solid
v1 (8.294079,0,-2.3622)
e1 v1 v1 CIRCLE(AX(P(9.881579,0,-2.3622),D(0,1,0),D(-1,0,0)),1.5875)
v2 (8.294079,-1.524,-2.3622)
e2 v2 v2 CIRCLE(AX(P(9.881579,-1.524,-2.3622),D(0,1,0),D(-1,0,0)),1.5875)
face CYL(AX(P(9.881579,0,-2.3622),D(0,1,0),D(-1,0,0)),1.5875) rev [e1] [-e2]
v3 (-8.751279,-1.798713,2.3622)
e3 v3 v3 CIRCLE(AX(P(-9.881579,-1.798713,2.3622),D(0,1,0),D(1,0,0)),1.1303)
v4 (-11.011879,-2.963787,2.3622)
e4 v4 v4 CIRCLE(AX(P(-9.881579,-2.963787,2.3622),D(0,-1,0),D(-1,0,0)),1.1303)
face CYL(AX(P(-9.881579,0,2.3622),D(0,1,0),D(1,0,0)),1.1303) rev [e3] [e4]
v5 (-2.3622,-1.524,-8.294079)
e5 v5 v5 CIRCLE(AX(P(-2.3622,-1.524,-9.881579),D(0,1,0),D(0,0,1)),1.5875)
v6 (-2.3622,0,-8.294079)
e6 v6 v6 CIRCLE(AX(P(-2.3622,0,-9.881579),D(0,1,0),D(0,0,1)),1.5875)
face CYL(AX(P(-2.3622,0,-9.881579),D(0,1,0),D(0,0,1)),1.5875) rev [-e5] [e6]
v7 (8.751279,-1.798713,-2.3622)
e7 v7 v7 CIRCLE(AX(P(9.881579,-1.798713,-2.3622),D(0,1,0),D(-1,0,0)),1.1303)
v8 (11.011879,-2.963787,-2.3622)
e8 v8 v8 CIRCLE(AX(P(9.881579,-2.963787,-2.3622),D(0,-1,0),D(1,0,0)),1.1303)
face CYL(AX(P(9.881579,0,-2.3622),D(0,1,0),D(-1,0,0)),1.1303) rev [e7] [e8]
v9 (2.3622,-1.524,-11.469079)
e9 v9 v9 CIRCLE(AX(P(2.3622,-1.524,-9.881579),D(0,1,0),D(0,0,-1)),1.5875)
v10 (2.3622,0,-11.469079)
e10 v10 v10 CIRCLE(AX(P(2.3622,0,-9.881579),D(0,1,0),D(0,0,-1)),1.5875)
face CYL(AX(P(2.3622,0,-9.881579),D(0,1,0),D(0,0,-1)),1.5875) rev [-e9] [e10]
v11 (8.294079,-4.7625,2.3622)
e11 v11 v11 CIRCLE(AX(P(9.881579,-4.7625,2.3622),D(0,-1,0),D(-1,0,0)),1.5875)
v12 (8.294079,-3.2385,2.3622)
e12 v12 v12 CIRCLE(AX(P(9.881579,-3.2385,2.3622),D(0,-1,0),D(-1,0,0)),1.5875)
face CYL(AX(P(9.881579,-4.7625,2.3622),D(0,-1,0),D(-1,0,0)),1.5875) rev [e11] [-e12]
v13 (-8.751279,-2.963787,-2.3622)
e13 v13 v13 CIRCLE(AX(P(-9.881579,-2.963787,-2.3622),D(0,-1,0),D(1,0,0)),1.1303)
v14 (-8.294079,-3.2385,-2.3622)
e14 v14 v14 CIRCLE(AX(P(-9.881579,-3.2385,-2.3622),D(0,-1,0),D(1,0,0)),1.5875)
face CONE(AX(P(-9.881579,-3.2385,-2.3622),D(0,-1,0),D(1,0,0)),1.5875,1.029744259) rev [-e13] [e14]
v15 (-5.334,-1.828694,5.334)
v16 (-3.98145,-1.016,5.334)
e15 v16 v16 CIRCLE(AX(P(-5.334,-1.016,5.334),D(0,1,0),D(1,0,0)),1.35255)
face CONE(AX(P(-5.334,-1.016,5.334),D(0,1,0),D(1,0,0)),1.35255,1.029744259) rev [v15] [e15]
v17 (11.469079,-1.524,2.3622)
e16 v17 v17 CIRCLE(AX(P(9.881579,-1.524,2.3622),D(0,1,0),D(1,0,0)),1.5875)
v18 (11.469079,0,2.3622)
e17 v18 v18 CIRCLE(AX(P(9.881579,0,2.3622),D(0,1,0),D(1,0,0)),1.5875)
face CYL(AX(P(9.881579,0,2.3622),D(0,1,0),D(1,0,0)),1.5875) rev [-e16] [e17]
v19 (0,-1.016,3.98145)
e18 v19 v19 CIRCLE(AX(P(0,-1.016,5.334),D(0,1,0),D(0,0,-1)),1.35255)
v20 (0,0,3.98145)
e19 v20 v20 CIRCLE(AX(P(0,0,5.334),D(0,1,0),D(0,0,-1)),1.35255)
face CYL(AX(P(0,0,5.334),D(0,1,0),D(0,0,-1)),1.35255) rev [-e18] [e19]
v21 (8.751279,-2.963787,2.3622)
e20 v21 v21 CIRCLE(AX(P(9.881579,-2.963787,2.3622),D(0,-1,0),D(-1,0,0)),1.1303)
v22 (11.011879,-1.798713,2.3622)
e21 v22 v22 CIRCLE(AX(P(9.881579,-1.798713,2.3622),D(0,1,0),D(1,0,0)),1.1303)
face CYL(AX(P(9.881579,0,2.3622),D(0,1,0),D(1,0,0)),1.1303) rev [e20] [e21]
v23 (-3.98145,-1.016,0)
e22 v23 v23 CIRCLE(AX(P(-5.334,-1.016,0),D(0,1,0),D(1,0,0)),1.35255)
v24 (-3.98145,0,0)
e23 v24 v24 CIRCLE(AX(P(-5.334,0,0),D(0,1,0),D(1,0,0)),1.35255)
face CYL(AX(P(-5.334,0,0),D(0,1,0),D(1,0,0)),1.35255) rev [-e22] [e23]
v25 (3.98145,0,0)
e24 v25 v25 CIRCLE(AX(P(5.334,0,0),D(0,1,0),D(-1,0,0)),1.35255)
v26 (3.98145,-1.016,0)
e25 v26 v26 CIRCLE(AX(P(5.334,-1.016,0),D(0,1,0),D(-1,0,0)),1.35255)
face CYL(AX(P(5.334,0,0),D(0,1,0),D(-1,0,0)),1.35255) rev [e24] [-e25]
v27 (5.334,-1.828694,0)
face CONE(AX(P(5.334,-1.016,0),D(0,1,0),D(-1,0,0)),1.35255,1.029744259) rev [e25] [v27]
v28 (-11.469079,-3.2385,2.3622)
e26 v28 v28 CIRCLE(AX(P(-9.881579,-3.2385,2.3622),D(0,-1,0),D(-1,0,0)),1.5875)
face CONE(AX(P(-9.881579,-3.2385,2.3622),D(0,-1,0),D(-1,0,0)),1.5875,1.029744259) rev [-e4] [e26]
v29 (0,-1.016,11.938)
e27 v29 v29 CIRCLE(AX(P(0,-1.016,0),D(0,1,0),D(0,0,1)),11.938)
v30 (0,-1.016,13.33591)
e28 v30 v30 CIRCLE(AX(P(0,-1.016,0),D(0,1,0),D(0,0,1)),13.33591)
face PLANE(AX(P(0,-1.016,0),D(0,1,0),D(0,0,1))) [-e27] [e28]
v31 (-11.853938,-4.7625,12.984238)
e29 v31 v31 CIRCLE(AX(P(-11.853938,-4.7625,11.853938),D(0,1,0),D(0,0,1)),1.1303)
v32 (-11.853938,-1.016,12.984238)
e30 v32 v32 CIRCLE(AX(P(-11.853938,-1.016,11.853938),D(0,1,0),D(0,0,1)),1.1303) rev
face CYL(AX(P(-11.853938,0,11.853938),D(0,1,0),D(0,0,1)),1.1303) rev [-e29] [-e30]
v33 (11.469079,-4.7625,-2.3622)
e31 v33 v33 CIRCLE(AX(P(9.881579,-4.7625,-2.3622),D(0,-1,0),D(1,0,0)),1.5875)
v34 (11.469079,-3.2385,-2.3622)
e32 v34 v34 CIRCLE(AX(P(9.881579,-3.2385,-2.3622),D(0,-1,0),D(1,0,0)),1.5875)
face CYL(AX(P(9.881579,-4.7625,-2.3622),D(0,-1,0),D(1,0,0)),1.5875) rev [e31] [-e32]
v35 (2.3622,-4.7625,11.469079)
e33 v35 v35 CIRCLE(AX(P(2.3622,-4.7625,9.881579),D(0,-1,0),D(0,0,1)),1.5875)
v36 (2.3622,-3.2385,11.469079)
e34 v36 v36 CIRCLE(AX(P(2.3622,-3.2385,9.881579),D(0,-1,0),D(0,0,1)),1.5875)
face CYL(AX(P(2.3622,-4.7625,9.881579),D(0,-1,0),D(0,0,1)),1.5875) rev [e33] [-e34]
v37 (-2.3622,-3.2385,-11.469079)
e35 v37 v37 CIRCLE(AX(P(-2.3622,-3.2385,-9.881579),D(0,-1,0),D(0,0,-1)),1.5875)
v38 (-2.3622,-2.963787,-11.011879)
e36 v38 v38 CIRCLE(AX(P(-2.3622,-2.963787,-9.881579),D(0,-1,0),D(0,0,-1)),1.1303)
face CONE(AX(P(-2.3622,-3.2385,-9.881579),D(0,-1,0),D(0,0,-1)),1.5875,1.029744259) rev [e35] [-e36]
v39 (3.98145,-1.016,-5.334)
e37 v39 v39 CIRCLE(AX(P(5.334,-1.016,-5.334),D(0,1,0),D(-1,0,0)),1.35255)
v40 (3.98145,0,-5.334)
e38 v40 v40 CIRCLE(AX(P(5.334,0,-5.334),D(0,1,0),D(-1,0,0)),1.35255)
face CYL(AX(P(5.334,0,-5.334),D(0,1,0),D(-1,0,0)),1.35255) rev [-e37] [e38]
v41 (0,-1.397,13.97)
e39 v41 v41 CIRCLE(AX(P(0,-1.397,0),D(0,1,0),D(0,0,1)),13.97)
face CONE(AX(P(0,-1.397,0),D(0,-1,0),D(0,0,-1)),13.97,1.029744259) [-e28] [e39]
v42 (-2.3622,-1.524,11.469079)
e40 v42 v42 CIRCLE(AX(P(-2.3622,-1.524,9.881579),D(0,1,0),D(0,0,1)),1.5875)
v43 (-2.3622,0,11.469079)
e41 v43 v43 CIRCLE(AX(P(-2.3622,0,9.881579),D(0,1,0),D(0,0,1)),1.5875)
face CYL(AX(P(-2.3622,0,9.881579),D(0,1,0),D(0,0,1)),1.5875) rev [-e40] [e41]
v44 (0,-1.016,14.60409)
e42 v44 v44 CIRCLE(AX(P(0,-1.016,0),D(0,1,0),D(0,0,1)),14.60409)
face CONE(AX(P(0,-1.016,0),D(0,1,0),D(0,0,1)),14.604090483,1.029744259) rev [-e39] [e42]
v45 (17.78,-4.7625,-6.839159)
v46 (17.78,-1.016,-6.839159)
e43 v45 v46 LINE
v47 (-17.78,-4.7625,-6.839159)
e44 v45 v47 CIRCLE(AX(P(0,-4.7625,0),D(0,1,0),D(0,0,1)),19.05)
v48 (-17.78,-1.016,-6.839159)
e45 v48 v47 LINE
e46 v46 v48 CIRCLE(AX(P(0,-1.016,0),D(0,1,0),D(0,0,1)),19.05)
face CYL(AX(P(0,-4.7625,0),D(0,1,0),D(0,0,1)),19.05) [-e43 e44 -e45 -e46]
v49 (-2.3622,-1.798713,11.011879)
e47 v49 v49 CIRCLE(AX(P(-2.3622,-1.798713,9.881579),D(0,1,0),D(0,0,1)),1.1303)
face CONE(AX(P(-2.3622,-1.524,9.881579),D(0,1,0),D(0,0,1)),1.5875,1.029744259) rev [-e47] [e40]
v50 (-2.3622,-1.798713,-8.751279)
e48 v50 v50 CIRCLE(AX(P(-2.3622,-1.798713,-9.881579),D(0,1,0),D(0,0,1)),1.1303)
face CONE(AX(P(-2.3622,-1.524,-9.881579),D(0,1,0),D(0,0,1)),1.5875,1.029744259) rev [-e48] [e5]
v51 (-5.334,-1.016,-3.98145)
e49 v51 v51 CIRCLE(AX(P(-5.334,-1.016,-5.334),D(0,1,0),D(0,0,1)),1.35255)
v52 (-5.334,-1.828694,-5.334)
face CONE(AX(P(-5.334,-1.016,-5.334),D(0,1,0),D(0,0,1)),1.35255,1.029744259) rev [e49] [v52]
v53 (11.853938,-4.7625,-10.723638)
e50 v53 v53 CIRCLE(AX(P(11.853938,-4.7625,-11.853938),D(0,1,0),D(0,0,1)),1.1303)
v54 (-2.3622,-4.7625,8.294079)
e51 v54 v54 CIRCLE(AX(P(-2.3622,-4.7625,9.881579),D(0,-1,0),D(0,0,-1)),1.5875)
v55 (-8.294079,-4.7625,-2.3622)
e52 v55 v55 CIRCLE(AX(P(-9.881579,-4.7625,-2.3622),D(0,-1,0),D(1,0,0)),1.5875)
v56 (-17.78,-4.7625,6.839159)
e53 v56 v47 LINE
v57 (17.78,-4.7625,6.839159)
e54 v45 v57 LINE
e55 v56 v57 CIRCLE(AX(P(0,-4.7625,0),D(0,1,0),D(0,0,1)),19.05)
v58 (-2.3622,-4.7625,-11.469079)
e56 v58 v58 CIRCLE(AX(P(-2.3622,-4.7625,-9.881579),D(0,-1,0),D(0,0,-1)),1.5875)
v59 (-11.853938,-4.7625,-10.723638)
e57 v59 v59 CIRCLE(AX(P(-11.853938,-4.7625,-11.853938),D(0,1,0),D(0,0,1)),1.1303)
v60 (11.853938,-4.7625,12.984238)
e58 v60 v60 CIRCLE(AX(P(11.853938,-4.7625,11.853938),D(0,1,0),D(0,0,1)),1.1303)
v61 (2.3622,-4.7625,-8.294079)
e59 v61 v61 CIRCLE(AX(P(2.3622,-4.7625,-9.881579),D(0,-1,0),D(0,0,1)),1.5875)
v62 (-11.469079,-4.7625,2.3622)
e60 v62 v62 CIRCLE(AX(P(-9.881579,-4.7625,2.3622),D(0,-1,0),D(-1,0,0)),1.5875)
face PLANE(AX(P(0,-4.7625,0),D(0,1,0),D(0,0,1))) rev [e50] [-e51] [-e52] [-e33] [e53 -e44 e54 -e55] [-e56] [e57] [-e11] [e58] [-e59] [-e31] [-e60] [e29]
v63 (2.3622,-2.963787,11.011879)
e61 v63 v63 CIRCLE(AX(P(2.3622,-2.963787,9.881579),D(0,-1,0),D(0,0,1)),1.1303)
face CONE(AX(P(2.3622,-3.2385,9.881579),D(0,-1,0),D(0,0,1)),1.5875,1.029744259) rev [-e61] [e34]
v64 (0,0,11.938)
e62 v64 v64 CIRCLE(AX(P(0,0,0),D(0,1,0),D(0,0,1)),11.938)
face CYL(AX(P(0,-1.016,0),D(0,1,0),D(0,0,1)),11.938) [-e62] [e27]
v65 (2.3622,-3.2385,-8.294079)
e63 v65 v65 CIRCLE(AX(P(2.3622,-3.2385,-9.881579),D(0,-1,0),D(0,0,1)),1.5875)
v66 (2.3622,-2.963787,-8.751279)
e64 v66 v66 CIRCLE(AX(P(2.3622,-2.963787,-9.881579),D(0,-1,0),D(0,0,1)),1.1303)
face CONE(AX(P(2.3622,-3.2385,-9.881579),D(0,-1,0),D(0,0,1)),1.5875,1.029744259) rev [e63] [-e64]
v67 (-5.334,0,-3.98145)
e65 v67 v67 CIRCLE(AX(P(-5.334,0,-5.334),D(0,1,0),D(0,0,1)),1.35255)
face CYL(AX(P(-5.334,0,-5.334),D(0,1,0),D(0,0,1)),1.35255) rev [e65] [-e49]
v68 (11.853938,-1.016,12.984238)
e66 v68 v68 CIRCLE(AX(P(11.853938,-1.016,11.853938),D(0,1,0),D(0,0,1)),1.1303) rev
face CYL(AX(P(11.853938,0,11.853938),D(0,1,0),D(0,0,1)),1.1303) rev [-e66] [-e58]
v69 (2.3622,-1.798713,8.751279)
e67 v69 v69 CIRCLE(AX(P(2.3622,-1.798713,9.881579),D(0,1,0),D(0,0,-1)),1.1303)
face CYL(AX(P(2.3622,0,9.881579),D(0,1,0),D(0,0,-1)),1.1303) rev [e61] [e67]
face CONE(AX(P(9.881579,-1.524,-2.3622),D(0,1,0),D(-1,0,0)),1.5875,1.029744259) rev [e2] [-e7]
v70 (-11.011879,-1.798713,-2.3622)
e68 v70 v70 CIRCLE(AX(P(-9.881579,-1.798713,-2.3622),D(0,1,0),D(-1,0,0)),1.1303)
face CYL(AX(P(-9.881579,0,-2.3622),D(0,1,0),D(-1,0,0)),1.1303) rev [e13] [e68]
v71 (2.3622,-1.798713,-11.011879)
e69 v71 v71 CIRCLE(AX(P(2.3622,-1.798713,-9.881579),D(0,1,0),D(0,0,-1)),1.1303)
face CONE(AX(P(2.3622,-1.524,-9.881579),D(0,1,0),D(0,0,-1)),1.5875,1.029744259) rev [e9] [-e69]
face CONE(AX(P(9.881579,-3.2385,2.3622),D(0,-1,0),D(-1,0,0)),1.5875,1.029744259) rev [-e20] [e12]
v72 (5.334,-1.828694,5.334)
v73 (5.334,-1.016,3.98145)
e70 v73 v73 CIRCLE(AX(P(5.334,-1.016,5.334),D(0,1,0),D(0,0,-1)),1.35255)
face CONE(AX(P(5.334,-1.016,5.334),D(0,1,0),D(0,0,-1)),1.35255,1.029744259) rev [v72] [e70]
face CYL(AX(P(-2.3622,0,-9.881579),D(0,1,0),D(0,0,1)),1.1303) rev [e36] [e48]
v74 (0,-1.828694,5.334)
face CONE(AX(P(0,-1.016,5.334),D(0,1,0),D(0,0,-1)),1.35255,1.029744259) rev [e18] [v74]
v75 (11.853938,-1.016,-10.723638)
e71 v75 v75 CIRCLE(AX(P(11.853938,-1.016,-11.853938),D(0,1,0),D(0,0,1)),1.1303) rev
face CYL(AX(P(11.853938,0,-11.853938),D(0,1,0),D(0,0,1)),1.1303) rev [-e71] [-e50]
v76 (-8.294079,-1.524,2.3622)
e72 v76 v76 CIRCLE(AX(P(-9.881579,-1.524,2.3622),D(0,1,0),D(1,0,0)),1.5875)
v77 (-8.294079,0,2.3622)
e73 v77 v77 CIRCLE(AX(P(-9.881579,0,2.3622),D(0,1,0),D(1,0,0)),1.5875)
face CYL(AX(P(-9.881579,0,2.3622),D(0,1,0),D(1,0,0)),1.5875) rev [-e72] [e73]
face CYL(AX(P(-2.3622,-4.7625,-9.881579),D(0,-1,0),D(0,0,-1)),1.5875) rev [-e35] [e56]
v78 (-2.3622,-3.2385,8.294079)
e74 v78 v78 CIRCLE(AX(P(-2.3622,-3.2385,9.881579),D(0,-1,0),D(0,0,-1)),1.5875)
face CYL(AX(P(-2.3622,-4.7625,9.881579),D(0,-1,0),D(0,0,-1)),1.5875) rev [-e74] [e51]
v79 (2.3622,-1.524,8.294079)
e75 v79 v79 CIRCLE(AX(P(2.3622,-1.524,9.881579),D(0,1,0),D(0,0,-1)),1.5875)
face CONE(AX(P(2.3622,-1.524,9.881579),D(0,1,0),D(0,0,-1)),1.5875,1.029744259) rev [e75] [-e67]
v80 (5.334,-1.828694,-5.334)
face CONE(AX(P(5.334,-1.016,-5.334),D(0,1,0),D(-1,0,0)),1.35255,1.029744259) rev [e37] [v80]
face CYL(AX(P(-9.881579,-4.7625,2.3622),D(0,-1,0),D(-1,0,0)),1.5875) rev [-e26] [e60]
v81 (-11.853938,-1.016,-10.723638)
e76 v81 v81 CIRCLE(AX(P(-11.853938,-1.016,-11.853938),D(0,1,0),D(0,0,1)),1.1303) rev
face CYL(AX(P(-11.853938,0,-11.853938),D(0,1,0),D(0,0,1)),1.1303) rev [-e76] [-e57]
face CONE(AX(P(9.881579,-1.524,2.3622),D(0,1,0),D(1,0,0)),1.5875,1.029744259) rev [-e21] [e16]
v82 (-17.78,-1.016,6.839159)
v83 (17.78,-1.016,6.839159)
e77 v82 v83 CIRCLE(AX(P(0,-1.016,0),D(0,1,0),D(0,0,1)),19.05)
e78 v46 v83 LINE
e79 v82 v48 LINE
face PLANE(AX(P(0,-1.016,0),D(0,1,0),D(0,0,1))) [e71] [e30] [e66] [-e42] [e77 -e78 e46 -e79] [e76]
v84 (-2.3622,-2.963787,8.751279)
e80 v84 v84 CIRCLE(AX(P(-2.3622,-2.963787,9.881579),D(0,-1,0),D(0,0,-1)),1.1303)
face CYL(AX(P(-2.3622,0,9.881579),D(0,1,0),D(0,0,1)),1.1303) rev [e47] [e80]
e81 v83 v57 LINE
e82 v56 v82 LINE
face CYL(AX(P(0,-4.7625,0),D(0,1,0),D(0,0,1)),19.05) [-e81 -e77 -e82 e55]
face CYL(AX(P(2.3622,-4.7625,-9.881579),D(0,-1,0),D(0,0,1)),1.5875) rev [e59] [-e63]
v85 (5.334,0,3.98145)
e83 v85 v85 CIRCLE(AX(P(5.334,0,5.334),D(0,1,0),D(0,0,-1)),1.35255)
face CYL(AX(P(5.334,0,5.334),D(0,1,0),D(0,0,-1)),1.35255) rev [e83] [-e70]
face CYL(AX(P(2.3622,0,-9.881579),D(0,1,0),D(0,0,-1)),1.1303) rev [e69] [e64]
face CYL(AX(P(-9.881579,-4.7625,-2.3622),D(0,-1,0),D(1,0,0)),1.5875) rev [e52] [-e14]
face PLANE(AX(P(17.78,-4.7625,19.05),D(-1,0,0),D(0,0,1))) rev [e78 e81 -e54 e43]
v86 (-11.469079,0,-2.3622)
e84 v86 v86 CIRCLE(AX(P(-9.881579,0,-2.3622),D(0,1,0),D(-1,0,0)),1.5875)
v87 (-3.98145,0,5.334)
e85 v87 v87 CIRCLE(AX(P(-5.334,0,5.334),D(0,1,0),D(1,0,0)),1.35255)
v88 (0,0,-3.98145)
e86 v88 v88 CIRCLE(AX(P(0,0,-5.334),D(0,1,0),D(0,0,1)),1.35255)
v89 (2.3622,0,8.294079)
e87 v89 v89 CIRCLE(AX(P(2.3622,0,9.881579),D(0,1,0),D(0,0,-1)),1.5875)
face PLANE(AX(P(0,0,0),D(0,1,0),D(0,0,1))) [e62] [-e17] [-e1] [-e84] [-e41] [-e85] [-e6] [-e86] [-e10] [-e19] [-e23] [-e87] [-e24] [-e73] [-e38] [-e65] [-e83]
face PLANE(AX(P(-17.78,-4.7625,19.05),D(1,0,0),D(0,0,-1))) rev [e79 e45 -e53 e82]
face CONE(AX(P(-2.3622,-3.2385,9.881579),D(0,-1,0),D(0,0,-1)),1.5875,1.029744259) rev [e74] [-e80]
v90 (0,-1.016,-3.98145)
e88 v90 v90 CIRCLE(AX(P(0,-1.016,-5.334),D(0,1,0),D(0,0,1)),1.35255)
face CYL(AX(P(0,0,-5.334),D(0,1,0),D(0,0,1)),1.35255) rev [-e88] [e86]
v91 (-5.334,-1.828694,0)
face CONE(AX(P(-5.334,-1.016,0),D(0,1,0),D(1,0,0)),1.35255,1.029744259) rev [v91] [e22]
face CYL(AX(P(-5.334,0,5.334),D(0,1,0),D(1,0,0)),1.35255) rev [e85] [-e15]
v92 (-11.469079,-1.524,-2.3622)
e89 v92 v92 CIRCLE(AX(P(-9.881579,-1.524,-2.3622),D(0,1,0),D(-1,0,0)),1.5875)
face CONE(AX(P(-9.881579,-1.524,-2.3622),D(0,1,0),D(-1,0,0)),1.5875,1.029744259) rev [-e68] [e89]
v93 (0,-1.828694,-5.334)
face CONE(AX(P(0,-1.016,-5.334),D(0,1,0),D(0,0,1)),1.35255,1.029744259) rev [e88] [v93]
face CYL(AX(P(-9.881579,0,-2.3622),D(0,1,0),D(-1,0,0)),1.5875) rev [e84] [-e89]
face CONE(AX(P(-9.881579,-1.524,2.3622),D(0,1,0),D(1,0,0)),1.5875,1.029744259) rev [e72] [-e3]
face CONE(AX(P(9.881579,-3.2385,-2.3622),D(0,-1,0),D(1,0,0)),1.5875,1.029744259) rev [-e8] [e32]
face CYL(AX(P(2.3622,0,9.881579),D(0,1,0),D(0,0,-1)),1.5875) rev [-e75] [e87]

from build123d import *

# Parameters (mm, degrees)
OUTER_R                               = 19.05
BODY_DEPTH                            = 4.7625
F_4_40_TAPPED_HOLE_D                  = 2.2606
SCREW_HOLES_COUNT                     = 4
F_43_0_089_DIAMETER_HOLE1_D           = 2.2606
F_1_8_0_125_DIAMETER_HOLE1_AT_2_COUNT = 2
F_1_8_0_125_DIAMETER_HOLE1_AT_2_PITCH = 19.763158772
F_1_8_0_125_DIAMETER_HOLE2_AT_2_COUNT = 2
F_1_8_0_125_DIAMETER_HOLE2_AT_2_PITCH = 19.763158772
IO_HOLES_PATTERN_COUNT                = 4
INSET_R                               = 19.05
INSET_R_2                             = 11.938
INSET_CUT_DEPTH                       = 1.016
POST_BOTTOMS_COUNT                    = 4
FLAT_CUT_SKETCH_W                     = 2.54
FLAT_CUT_SKETCH_H                     = 38.1
FLAT_CUT_DEPTH                        = 28.358479604


# Read off the part's stored shape, not the designer's step: #36 (0.1065) Diameter Hole1
with BuildPart() as part:
    # outer → Body (new body)
    with BuildSketch(Plane(origin=(0, 0, 0), x_dir=(1, 0, 0), z_dir=(0, 1, 0))):
        with Locations(Location((0, 0, 0), (0, 0, 270))):
            Circle(OUTER_R)
    extrude(amount=-BODY_DEPTH)

    # #4-40 Tapped Hole (through all)
    with Locations(Plane(origin=(0, 0, 0), x_dir=(1, 0, 0), z_dir=(0, 1, 0))):
        with Locations((-11.85393808, 11.85393808)):
            f_4_40_tapped_hole = Hole(F_4_40_TAPPED_HOLE_D / 2)

    # Screw Holes: #4-40 Tapped Hole ×4 about axis
    screw_holes_axis = Axis((0, 0, 0), (0, 1, 0))
    for i in range(1, SCREW_HOLES_COUNT):
        add(f_4_40_tapped_hole.rotate(screw_holes_axis, i * 360 / SCREW_HOLES_COUNT), mode=Mode.SUBTRACT)

    # #43 (0.089) Diameter Hole1 (through all)
    with Locations(Plane(origin=(0, 0, 0), x_dir=(1, 0, 0), z_dir=(0, 1, 0))):
        with Locations((-2.3622, 9.881579386), (-2.3622, -9.881579386)):
            f_43_0_089_diameter_hole1 = Hole(F_43_0_089_DIAMETER_HOLE1_D / 2)

    # Sketch40 → 1/8 (0.125) Diameter Hole1 (revolve, cut)
    with BuildSketch(Plane(origin=(-2.3622, 0, -9.881579386), x_dir=(0, 0, 1), z_dir=(1, 0, 0))):
        Polygon((0, 0), (0, 2.477866233), (1.5875, 1.524), (1.5875, 0), align=None)
    f_1_8_0_125_diameter_hole1 = revolve(axis=Axis((-2.3622, 6.35, -9.881579386), (0, -1, 0)), mode=Mode.SUBTRACT)

    # 1/8 (0.125) Diameter Hole1 at 2: 1/8 (0.125) Diameter Hole1 ×2
    with Locations(*[(0, 0, i * F_1_8_0_125_DIAMETER_HOLE1_AT_2_PITCH) for i in range(1, F_1_8_0_125_DIAMETER_HOLE1_AT_2_COUNT)]):
        add(f_1_8_0_125_diameter_hole1, mode=Mode.SUBTRACT)

    # Sketch42 → 1/8 (0.125) Diameter Hole2 (revolve, cut)
    with BuildSketch(Plane(origin=(-2.3622, -4.7625, -9.881579386), x_dir=(0, 0, -1), z_dir=(1, 0, 0))):
        Polygon((0, 0), (0, 2.477866233), (1.5875, 1.524), (1.5875, 0), align=None)
    f_1_8_0_125_diameter_hole2 = revolve(axis=Axis((-2.3622, -11.1125, -9.881579386), (0, 1, 0)), mode=Mode.SUBTRACT)

    # 1/8 (0.125) Diameter Hole2 at 2: 1/8 (0.125) Diameter Hole2 ×2
    with Locations(*[(0, 0, i * F_1_8_0_125_DIAMETER_HOLE2_AT_2_PITCH) for i in range(1, F_1_8_0_125_DIAMETER_HOLE2_AT_2_COUNT)]):
        add(f_1_8_0_125_diameter_hole2, mode=Mode.SUBTRACT)

    # IO Holes Pattern: #43 (0.089) Diameter Hole1, 1/8 (0.125) Diameter Hole1, 1/8 (0.125) Diameter Hole2 ×4 about axis
    io_holes_pattern_axis = Axis((0, 0, 0), (0, 1, 0))
    add([f_43_0_089_diameter_hole1.rotate(io_holes_pattern_axis, i * 360 / IO_HOLES_PATTERN_COUNT) for i in range(1, IO_HOLES_PATTERN_COUNT)], mode=Mode.SUBTRACT)
    add([f_1_8_0_125_diameter_hole1.rotate(io_holes_pattern_axis, i * 360 / IO_HOLES_PATTERN_COUNT) for i in range(1, IO_HOLES_PATTERN_COUNT)], mode=Mode.SUBTRACT)
    add([f_1_8_0_125_diameter_hole2.rotate(io_holes_pattern_axis, i * 360 / IO_HOLES_PATTERN_COUNT) for i in range(1, IO_HOLES_PATTERN_COUNT)], mode=Mode.SUBTRACT)

    # IO Holes Pattern copy 1 sketch → IO Holes Pattern copy 1 (revolve, cut)
    with BuildSketch(Plane(origin=(9.881579386, 0, 2.3622), x_dir=(1, 0, 0), z_dir=(0, 0, -1))):
        Polygon((0, 0), (0, 2.477866233), (1.5875, 1.524), (1.5875, 0), align=None)
    revolve(axis=Axis((9.881579386, 6.35, 2.3622), (0, -1, 0)), mode=Mode.SUBTRACT)

    # IO Holes Pattern copy 2 sketch → IO Holes Pattern copy 2 (revolve, cut)
    with BuildSketch(Plane(origin=(2.3622, 0, -9.881579386), x_dir=(0, 0, -1), z_dir=(-1, 0, 0))):
        Polygon((0, 0), (0, 2.477866233), (1.5875, 1.524), (1.5875, 0), align=None)
    revolve(axis=Axis((2.3622, 6.35, -9.881579386), (0, -1, 0)), mode=Mode.SUBTRACT)

    # IO Holes Pattern copy 3 sketch → IO Holes Pattern copy 3 (revolve, cut)
    with BuildSketch(Plane(origin=(-9.881579386, 0, -2.3622), x_dir=(-1, 0, 0), z_dir=(0, 0, 1))):
        Polygon((0, 0), (0, 2.477866233), (1.5875, 1.524), (1.5875, 0), align=None)
    revolve(axis=Axis((-9.881579386, 6.35, -2.3622), (0, -1, 0)), mode=Mode.SUBTRACT)

    # IO Holes Pattern copy 4 sketch → IO Holes Pattern copy 4 (revolve, cut)
    with BuildSketch(Plane(origin=(9.881579386, -4.7625, 2.3622), x_dir=(-1, 0, 0), z_dir=(0, 0, -1))):
        Polygon((0, 0), (0, 2.477866233), (1.5875, 1.524), (1.5875, 0), align=None)
    revolve(axis=Axis((9.881579386, -11.1125, 2.3622), (0, 1, 0)), mode=Mode.SUBTRACT)

    # IO Holes Pattern copy 5 sketch → IO Holes Pattern copy 5 (revolve, cut)
    with BuildSketch(Plane(origin=(2.3622, -4.7625, -9.881579386), x_dir=(0, 0, 1), z_dir=(-1, 0, 0))):
        Polygon((0, 0), (0, 2.477866233), (1.5875, 1.524), (1.5875, 0), align=None)
    revolve(axis=Axis((2.3622, -11.1125, -9.881579386), (0, 1, 0)), mode=Mode.SUBTRACT)

    # IO Holes Pattern copy 6 sketch → IO Holes Pattern copy 6 (revolve, cut)
    with BuildSketch(Plane(origin=(-9.881579386, -4.7625, -2.3622), x_dir=(1, 0, 0), z_dir=(0, 0, 1))):
        Polygon((0, 0), (0, 2.477866233), (1.5875, 1.524), (1.5875, 0), align=None)
    revolve(axis=Axis((-9.881579386, -11.1125, -2.3622), (0, 1, 0)), mode=Mode.SUBTRACT)

    # Inset → Inset Cut (cut)
    with BuildSketch(Plane(origin=(0, 0, 0), x_dir=(1, 0, 0), z_dir=(0, 1, 0))):
        with Locations(Location((0, 0, 0), (0, 0, 270))):
            Circle(INSET_R)
        with Locations(Location((0, 0, 0), (0, 0, 270))):
            Circle(INSET_R_2, mode=Mode.SUBTRACT)
    extrude(amount=-INSET_CUT_DEPTH, mode=Mode.SUBTRACT)

    # #36 (0.1065) Diameter Hole1 outline → #36 (0.1065) Diameter Hole1 (revolve, cut)
    with BuildSketch(Plane(origin=(-5.334, 0, -5.334), x_dir=(1, 0, 0), z_dir=(0, 0, 1))):
        Polygon((0, 0), (0, -1.82869403), (1.35255, -1.016), (1.35255, 0), align=None)
    f_36_0_1065_diameter_hole1 = revolve(axis=Axis((-5.334, 0, -5.334), (0, 1, 0)), mode=Mode.SUBTRACT)

    # 36 _0.1065_ Diameter Hole1 2 outline → 36 _0.1065_ Diameter Hole1 2 (revolve, cut)
    with BuildSketch(Plane.XY.offset(-5.334)):
        Polygon((0, 0), (0, -1.82869403), (1.35255, -1.016), (1.35255, 0), align=None)
    f_36_0_1065_diameter_hole1_2 = revolve(axis=Axis((0, 0, -5.334), (0, 1, 0)), mode=Mode.SUBTRACT)

    # Post Bottoms: #36 (0.1065) Diameter Hole1, 36 _0.1065_ Diameter Hole1 2 ×4 about axis
    post_bottoms_axis = Axis((0, 0, 0), (0, 1, 0))
    add([f_36_0_1065_diameter_hole1.rotate(post_bottoms_axis, i * 360 / POST_BOTTOMS_COUNT) for i in range(1, POST_BOTTOMS_COUNT)], mode=Mode.SUBTRACT)
    add([f_36_0_1065_diameter_hole1_2.rotate(post_bottoms_axis, i * 360 / POST_BOTTOMS_COUNT) for i in range(1, POST_BOTTOMS_COUNT)], mode=Mode.SUBTRACT)

    # v_sketch → V cut (revolve, cut)
    with BuildSketch(Plane.XY, mode=Mode.PRIVATE) as v_cut_sk:
        Polygon((-13.97, -1.397), (-13.335909517, -1.016), (-14.604090483, -1.016), align=None)
    revolve(v_cut_sk.sketch.rotate(Axis((0, 0.15875, 0), (0, -1, 0)), 270), axis=Axis((0, 0.15875, 0), (0, -1, 0)), mode=Mode.SUBTRACT)

    # Flat Cut Sketch → Flat Cut (cut, through all)
    with BuildSketch(Plane(origin=(0, 0, 0), x_dir=(1, 0, 0), z_dir=(0, 1, 0))):
        with Locations((19.05, 0)):
            Rectangle(FLAT_CUT_SKETCH_W, FLAT_CUT_SKETCH_H)
        with Locations((-19.05, 0)):
            Rectangle(FLAT_CUT_SKETCH_W, FLAT_CUT_SKETCH_H)
    extrude(amount=-FLAT_CUT_DEPTH, mode=Mode.SUBTRACT)


solid = part.part
